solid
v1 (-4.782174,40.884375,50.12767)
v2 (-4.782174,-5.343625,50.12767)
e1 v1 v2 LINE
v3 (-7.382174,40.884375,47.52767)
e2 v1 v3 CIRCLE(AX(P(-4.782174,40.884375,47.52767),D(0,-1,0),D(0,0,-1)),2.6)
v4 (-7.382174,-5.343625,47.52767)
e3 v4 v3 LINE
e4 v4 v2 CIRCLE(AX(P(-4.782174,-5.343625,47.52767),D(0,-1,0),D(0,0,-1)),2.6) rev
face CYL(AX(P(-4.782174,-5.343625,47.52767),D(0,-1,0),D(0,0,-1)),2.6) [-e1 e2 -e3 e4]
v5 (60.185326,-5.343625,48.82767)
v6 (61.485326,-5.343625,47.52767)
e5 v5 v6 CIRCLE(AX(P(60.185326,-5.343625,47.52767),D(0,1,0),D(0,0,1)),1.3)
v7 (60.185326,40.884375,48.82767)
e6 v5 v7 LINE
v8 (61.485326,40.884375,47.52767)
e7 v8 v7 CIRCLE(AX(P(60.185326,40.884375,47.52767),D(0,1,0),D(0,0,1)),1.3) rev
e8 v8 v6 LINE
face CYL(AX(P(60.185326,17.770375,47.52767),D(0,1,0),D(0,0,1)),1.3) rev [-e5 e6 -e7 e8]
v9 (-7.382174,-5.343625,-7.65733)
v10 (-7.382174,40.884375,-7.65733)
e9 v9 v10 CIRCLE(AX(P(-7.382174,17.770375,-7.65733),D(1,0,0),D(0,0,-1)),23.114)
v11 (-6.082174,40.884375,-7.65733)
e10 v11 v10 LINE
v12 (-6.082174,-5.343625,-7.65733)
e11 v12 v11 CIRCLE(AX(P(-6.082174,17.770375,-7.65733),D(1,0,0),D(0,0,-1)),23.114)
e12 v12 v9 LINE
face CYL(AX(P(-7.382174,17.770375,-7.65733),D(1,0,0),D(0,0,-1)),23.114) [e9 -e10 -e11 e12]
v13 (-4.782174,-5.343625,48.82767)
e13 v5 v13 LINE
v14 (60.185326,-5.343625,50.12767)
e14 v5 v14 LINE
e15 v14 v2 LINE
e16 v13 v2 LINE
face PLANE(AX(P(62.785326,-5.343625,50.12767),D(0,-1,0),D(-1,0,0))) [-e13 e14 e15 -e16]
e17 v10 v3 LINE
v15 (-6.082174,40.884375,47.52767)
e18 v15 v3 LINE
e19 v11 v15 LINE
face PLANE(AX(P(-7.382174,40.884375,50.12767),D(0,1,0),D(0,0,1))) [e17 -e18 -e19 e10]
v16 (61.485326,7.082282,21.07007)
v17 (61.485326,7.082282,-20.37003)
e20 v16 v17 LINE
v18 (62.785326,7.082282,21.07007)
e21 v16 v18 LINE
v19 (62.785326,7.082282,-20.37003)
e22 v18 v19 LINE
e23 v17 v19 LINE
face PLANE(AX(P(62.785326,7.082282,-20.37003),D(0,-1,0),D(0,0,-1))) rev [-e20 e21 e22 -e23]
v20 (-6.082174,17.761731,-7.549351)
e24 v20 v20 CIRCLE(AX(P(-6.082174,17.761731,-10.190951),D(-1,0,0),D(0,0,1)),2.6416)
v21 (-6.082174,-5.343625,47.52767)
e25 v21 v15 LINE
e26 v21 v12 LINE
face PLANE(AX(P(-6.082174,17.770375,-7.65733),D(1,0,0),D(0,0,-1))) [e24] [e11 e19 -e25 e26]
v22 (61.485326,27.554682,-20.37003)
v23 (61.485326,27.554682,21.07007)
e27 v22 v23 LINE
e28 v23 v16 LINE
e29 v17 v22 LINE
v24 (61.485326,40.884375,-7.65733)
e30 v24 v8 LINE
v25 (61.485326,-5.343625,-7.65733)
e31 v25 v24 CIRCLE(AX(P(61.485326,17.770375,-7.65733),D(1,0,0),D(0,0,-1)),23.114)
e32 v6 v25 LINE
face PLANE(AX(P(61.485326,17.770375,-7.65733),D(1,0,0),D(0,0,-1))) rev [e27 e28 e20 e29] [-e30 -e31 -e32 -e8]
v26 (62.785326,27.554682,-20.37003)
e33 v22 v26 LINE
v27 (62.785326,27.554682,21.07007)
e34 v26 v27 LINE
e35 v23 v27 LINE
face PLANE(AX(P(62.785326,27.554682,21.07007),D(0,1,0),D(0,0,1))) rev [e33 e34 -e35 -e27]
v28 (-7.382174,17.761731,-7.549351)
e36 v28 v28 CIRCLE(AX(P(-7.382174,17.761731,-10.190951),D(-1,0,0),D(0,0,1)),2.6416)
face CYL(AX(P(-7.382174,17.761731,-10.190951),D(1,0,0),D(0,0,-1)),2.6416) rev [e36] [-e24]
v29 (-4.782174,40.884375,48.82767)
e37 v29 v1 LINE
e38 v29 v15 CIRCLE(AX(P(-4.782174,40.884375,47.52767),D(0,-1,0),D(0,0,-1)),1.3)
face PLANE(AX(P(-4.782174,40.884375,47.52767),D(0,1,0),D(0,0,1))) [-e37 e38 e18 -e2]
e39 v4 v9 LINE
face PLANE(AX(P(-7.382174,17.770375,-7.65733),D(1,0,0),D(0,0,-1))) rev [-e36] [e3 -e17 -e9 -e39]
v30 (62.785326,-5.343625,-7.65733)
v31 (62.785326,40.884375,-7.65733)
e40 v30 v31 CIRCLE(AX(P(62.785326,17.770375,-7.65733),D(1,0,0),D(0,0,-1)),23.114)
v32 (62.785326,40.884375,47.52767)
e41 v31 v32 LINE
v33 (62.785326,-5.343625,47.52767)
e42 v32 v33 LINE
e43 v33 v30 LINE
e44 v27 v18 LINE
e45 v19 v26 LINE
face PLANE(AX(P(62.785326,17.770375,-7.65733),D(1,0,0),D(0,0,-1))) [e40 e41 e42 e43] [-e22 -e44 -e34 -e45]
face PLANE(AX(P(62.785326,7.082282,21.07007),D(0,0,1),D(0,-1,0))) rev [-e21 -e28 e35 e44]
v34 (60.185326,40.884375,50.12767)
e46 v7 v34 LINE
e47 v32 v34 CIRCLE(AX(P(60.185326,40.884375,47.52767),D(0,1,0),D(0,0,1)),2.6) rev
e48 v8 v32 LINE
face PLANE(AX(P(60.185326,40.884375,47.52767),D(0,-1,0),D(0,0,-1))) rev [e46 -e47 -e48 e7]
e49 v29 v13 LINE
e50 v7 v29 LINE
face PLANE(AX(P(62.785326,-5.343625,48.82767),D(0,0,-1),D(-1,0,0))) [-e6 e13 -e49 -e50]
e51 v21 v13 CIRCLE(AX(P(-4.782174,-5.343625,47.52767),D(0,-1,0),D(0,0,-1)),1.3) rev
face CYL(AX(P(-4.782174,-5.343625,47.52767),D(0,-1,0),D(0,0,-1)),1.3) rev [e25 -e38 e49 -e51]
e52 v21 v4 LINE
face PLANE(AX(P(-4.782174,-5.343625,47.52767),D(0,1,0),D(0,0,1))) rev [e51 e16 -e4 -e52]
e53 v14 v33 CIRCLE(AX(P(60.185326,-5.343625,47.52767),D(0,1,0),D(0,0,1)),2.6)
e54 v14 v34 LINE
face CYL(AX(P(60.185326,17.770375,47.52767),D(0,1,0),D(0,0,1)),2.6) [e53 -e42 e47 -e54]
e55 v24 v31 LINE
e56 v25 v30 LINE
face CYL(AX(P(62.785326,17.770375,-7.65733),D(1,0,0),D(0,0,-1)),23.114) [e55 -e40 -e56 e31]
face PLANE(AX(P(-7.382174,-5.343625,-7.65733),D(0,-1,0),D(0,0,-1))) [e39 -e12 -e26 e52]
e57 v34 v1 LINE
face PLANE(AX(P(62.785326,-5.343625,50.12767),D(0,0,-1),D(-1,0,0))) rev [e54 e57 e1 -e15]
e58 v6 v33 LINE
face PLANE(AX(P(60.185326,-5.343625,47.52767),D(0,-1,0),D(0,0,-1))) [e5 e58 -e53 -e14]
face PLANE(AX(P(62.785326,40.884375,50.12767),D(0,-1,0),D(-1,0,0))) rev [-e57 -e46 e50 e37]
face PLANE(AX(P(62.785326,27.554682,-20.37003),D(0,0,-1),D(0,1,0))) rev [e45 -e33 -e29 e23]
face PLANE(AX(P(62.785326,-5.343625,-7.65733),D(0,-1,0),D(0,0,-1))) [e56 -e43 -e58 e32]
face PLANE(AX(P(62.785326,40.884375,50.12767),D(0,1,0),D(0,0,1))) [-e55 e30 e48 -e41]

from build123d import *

# Parameters (mm, degrees)
BOSS_EXTRUDE1_DEPTH        = 53.974999999999994
CUT_EXTRUDE1_DEPTH         = 53.974999999999994
CUT_EXTRUDE2_DEPTH         = 40.64
SKETCH4_R                  = 2.0319999999999996
CUT_EXTRUDE3_DEPTH         = 12.699999999999996
CONVERT_SOLID1_DEPTH       = 35.56
CONVERT_SOLID1_START       = 0.640171996
CONVERT_SOLID1_2_OUTLINE_R = 2.032
CONVERT_SOLID1_2_DEPTH     = 0.359828036
CONVERT_SOLID1_START_2     = 52.974999968
CONVERT_SOLID1_3_OUTLINE_W = 15.748000000000001
CONVERT_SOLID1_3_OUTLINE_H = 31.877
CONVERT_SOLID1_3_DEPTH     = 0.241146378
CONVERT_SOLID1_START_3     = 1.000000032
CONVERT_SOLID1_4_OUTLINE_W = 35.56
CONVERT_SOLID1_4_OUTLINE_H = 0.1377071679999986
CONVERT_SOLID1_4_DEPTH     = 51.974999936
CONVERT_SOLID1_5_DEPTH     = 35.56
SCALE1_SCALE               = 1.3


with BuildPart() as part:
    # Sketch1 → Boss-Extrude1 (new body)
    with BuildSketch(Plane(origin=(0, 0, 0), x_dir=(0, 0, -1), z_dir=(1, 0, 0))):
        with BuildLine():
            Line((0, 0), (-44.449999999999996, -5.44e-15))
            Line((-44.449999999999996, -5.44e-15), (-44.449999999999996, 35.55999999999999))
            Line((-44.449999999999996, 35.55999999999999), (0, 35.55999999999999))
            ThreePointArc((0, 35.55999999999999), (17.779999999999994, 17.779999999999994), (0, 0))
        make_face()
    extrude(amount=BOSS_EXTRUDE1_DEPTH)

    # Sketch2 → Cut-Extrude1 (cut)
    with BuildSketch(Plane(origin=(0, 35.55999999999999, 0), x_dir=(1, 0, 0), z_dir=(0, 1, 0))):
        Polygon((0.6401719962352073, 17.998125077829755), (0.6401719962352074, -43.58770713635029), (53.21614634609016, -43.58770713635029), (53.21614634609016, 17.998125077829755), align=None)
    extrude(amount=-CUT_EXTRUDE1_DEPTH, mode=Mode.SUBTRACT)

    # Sketch3 → Cut-Extrude2 (cut)
    with BuildSketch(Plane(origin=(53.974999999999994, 0, 0), x_dir=(0, 0, -1), z_dir=(1, 0, 0))):
        Polygon((-22.098, 25.306389569999986), (9.779, 25.306389569999986), (9.778999999999996, 9.558389569999989), (-22.098, 9.558389569999983), align=None)
    extrude(amount=-CUT_EXTRUDE2_DEPTH, mode=Mode.SUBTRACT)

    # Sketch4 → Cut-Extrude3 (cut)
    with BuildSketch(Plane.ZY):
        with Locations((-1.948939271970541, 17.773350266981094)):
            Circle(SKETCH4_R)
    extrude(amount=-CUT_EXTRUDE3_DEPTH, mode=Mode.SUBTRACT)

    # Convert-Solid1: read off the stored shape, not the designer's step
    # Convert-Solid1 outline → Convert-Solid1 (cut)
    with BuildSketch(Plane(origin=(0, 0, 0), x_dir=(1, 0, 0), z_dir=(0, 1, 0))):
        with BuildLine():
            Line((0, -44.45), (2.000000064, -44.45))
            ThreePointArc((2.000000064, -44.45), (0.585786456, -43.864213544), (0, -42.449999936))
            Line((0, -42.449999936), (0, -44.45))
        make_face()
        with BuildLine():
            Line((53.975, -44.45), (53.975, -42.449999936))
            ThreePointArc((53.975, -42.449999936), (53.389213544, -43.864213544), (51.974999936, -44.45))
            Line((51.974999936, -44.45), (53.975, -44.45))
        make_face()
    extrude(amount=CONVERT_SOLID1_DEPTH, mode=Mode.SUBTRACT)

    # Convert-Solid1 2 outline → Convert-Solid1 2 (add)
    with BuildSketch(Plane.YZ.offset(CONVERT_SOLID1_START)):
        with BuildLine():
            Line((35.56, 43.587707136), (0, 43.587707136))
            Line((0, 43.587707136), (0, 0))
            ThreePointArc((0, 0), (17.78, -17.78), (35.56, 0))
            Line((35.56, 0), (35.56, 43.587707136))
        make_face()
        with Locations((17.773350267, -1.948939272)):
            Circle(CONVERT_SOLID1_2_OUTLINE_R, mode=Mode.SUBTRACT)
    extrude(amount=CONVERT_SOLID1_2_DEPTH)

    # Convert-Solid1 3 outline → Convert-Solid1 3 (add)
    with BuildSketch(Plane.YZ.offset(CONVERT_SOLID1_START_2)):
        with BuildLine():
            Line((35.56, 43.587707136), (0, 43.587707136))
            Line((0, 43.587707136), (0, 0))
            ThreePointArc((0, 0), (17.78, -17.78), (35.56, 0))
            Line((35.56, 0), (35.56, 43.587707136))
        make_face()
        with Locations((17.432389569999998, 6.1594999999999995)):
            Rectangle(CONVERT_SOLID1_3_OUTLINE_W, CONVERT_SOLID1_3_OUTLINE_H, mode=Mode.SUBTRACT)
    extrude(amount=CONVERT_SOLID1_3_DEPTH)

    # Convert-Solid1 4 outline → Convert-Solid1 4 (add)
    with BuildSketch(Plane.YZ.offset(CONVERT_SOLID1_START_3)):
        with Locations((17.78, 43.518853551999996)):
            Rectangle(CONVERT_SOLID1_4_OUTLINE_W, CONVERT_SOLID1_4_OUTLINE_H)
    extrude(amount=CONVERT_SOLID1_4_DEPTH)

    # Convert-Solid1 5 outline → Convert-Solid1 5 (add)
    with BuildSketch(Plane(origin=(0, 0, 0), x_dir=(1, 0, 0), z_dir=(0, 1, 0))):
        with BuildLine():
            Line((1.000000032, -43.449999968), (2.000000064, -43.449999968))
            ThreePointArc((2.000000064, -43.449999968), (1.29289326, -43.15710674), (1.000000032, -42.449999936))
            Line((1.000000032, -42.449999936), (1.000000032, -43.449999968))
        make_face()
        with BuildLine():
            ThreePointArc((52.974999968, -42.449999936), (52.68210674, -43.15710674), (51.974999936, -43.449999968))
            Line((51.974999936, -43.449999968), (52.974999968, -43.449999968))
            Line((52.974999968, -43.449999968), (52.974999968, -42.449999936))
        make_face()
    extrude(amount=CONVERT_SOLID1_5_DEPTH)


with BuildPart() as part_1:
    # Scale1: scaled about (24.607246438, 17.812081852, 25.524433927)
    add(part.part.scale(SCALE1_SCALE).moved(Location((-7.382173931400001, -5.3436245556, -7.657330178100001))))


solid = part_1.part
